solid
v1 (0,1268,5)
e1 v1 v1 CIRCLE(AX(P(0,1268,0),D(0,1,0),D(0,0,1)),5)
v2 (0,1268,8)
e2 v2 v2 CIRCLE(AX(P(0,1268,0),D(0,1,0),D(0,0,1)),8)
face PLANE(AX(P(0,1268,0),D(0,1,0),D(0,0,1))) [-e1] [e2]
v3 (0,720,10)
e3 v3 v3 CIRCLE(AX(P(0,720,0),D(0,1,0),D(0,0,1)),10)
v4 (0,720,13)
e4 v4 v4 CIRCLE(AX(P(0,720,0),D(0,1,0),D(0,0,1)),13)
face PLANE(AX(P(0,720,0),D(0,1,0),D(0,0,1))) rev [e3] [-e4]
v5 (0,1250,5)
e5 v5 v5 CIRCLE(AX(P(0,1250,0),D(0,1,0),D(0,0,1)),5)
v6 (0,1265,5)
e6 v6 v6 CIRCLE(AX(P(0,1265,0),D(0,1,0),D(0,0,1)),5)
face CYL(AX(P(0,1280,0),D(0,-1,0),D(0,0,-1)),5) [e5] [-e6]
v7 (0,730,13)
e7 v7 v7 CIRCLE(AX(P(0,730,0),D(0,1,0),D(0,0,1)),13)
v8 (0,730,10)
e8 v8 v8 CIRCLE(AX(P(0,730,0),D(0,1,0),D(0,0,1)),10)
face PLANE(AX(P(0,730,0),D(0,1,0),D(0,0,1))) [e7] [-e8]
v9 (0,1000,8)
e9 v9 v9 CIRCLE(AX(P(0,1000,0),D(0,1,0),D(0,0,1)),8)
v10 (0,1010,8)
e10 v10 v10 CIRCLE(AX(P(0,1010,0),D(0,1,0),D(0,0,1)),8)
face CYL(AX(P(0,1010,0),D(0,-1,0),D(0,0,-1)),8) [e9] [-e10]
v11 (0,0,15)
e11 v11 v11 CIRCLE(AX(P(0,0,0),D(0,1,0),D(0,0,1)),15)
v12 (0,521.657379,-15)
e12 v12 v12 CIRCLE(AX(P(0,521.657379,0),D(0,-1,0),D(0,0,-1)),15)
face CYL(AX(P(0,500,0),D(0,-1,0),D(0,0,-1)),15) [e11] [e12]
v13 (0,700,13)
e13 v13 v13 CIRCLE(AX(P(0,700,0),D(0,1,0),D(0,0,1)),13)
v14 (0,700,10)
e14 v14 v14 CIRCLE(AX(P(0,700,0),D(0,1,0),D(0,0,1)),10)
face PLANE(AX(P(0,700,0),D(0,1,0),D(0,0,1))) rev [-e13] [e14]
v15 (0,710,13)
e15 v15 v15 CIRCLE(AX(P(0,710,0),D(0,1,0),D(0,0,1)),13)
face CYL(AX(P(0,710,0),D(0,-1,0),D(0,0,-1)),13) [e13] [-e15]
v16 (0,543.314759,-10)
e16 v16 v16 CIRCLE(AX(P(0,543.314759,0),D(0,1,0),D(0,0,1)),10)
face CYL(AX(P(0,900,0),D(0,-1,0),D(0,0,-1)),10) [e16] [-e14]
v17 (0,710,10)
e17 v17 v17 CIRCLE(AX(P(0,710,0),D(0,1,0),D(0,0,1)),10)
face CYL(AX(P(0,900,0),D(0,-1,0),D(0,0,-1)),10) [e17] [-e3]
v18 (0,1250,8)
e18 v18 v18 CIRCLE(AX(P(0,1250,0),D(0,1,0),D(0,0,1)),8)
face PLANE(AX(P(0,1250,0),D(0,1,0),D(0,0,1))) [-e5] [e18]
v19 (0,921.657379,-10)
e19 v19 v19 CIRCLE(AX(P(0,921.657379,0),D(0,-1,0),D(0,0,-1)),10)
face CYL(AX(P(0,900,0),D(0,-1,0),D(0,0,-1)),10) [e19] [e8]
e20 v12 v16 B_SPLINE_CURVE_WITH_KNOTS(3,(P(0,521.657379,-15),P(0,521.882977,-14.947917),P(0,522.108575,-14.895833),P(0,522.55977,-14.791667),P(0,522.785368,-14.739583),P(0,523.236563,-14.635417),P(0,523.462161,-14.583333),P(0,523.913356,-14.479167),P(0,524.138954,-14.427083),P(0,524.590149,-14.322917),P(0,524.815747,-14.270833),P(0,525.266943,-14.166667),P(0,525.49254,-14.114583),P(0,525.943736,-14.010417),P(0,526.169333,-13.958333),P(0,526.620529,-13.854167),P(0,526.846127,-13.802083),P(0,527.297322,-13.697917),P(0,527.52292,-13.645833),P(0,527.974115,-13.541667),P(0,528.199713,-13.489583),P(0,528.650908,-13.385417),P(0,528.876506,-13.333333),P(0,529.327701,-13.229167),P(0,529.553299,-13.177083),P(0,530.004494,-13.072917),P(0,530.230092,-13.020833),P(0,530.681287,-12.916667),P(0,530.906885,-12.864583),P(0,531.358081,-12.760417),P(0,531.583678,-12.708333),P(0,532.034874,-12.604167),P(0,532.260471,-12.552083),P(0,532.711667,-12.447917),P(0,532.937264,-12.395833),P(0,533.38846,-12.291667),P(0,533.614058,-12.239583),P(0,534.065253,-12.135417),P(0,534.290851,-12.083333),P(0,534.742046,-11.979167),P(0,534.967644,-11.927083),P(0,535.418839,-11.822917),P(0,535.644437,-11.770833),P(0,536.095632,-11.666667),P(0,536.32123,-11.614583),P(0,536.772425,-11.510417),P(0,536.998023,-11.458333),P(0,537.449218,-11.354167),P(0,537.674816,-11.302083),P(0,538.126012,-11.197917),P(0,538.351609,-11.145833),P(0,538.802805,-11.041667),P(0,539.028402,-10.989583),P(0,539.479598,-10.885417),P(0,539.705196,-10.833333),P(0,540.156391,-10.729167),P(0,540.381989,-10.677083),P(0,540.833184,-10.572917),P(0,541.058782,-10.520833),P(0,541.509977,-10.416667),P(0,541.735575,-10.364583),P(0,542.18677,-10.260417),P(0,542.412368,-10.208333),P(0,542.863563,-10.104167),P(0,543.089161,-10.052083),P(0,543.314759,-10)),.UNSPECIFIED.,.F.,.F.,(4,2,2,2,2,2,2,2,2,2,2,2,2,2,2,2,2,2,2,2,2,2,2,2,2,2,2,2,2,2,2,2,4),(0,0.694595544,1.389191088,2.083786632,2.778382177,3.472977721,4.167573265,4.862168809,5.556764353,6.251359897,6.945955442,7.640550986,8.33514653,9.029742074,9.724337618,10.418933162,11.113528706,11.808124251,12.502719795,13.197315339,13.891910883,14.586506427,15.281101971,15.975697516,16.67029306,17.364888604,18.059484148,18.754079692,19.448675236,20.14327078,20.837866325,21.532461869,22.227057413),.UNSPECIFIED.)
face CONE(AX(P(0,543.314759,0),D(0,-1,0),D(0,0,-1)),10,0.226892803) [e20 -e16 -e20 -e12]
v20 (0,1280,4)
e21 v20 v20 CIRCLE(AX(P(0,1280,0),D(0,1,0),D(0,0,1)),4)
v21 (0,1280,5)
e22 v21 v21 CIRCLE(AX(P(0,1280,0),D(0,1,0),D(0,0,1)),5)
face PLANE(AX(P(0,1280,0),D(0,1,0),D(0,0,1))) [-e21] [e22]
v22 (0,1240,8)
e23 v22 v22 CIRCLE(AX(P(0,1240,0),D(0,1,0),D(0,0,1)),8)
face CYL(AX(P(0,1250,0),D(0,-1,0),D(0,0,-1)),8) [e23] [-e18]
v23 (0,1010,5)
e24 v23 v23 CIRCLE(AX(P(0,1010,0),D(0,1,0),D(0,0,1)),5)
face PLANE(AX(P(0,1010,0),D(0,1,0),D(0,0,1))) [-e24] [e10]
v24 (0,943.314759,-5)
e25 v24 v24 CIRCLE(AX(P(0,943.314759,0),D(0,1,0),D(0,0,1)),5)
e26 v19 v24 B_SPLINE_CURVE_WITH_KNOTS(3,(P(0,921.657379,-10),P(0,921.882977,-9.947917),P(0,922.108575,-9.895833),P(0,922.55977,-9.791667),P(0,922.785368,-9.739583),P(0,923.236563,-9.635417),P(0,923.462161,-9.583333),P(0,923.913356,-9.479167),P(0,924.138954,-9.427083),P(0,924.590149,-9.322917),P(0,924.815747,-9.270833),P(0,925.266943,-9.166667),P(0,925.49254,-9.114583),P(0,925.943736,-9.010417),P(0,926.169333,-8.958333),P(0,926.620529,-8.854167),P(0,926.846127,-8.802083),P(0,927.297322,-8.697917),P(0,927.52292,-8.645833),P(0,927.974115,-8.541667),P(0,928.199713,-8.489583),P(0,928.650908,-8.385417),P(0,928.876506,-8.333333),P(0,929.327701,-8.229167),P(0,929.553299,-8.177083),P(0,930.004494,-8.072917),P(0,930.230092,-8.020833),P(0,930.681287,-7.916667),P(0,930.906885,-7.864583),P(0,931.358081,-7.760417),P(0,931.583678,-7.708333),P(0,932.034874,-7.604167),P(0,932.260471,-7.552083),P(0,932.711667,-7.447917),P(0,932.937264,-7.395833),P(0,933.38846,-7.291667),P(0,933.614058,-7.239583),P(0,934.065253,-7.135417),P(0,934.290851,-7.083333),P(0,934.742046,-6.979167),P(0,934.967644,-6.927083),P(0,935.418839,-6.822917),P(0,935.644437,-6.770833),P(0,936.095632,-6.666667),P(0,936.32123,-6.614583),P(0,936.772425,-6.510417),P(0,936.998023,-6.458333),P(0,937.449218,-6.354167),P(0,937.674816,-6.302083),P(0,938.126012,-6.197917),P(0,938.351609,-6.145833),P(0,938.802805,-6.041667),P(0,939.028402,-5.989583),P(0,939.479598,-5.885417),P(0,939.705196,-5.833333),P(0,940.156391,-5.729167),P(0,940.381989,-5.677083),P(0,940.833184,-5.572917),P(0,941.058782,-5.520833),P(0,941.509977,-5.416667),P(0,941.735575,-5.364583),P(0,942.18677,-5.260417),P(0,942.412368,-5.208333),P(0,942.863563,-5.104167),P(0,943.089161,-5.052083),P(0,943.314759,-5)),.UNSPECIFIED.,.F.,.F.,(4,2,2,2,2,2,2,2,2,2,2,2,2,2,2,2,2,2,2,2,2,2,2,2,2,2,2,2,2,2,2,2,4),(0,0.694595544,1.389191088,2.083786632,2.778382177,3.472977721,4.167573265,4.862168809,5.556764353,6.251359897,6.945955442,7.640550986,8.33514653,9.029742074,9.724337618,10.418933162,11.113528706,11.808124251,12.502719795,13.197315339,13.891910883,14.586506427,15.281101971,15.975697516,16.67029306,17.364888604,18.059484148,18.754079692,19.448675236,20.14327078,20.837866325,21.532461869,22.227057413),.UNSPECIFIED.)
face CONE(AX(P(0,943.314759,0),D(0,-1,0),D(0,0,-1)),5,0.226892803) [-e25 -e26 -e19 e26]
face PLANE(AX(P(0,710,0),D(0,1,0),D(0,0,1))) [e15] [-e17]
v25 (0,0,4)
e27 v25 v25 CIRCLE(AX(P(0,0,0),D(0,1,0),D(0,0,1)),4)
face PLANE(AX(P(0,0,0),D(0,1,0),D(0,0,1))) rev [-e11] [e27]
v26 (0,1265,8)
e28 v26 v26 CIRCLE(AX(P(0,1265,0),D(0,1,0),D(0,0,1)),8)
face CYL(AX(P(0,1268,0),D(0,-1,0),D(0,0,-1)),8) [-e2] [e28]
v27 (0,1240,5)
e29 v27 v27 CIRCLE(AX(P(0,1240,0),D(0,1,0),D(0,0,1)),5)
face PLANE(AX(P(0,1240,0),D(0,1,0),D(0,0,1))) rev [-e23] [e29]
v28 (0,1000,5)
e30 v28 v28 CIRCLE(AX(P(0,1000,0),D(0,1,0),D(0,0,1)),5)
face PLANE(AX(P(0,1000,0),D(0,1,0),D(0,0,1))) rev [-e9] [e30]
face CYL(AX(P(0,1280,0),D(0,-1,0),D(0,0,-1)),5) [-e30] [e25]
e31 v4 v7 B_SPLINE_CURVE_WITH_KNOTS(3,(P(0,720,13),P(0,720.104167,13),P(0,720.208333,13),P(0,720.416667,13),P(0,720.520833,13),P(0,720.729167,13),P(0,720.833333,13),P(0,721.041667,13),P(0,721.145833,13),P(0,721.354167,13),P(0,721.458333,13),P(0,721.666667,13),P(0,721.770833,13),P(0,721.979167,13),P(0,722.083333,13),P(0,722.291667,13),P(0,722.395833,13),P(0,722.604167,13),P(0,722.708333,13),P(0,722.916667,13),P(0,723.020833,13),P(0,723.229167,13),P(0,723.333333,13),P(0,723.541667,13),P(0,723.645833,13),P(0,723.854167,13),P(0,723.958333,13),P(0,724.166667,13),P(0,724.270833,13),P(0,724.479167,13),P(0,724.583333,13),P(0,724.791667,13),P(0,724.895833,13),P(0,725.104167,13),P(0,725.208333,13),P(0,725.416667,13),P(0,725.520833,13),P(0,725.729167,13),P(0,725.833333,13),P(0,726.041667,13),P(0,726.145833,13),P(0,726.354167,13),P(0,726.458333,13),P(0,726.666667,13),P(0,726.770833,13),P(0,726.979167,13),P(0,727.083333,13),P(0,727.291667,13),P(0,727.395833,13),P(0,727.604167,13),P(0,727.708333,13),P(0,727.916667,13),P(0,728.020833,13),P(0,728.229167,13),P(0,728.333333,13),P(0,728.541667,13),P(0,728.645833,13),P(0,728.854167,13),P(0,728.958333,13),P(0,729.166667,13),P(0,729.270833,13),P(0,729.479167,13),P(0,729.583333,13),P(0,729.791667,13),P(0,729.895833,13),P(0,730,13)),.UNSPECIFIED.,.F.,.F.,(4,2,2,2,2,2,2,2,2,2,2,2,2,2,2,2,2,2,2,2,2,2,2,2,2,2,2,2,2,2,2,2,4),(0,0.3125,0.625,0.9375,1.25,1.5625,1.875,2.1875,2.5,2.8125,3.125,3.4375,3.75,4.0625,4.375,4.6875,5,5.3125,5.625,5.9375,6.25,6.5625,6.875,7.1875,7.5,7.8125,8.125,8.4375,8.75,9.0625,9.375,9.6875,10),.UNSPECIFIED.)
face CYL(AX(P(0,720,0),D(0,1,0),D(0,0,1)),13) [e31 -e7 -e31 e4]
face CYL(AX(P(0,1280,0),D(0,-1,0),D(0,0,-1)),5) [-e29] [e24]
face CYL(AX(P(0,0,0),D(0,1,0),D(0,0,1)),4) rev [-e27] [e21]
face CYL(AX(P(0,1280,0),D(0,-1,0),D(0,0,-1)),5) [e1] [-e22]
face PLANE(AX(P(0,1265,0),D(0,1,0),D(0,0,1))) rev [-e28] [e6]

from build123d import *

# Parameters (mm, degrees)
ESQUISSE1_R                  = 5
BOSS_EXTRU_1_DEPTH           = 1280
ESQUISSE2_R                  = 15
BOSS_EXTRU_2_DEPTH           = 500
ESQUISSE3_R                  = 10
BOSS_EXTRU_3_DEPTH           = 400
CHANFREIN1_SIZE              = 10
CHANFREIN1_SIZE_2            = 43.314758743
ENL_V_MAT_EXTRU_1_DEPTH      = 1281.175769182
ENL_V_MAT_EXTRU_1_DEPTH_BACK = 1281.175769182
ESQUISSE4_R                  = 4
ESQUISSE5_R                  = 13
ESQUISSE5_R_2                = 9.409989574
BOSS_EXTRU_4_DEPTH           = 10
ESQUISSE7_R                  = 8
ESQUISSE7_R_2                = 4.592937417
BOSS_EXTRU_5_DEPTH           = 10
ESQUISSE6_R                  = 8
ESQUISSE6_R_2                = 4.579122691
BOSS_EXTRU_6_DEPTH           = 10
BOSS_EXTRU_7_START           = 720
BOSS_EXTRU_7_OUTLINE_R       = 13
BOSS_EXTRU_7_OUTLINE_R_2     = 10
BOSS_EXTRU_7_DEPTH           = 10
ESQUISSE8_R                  = 8
ESQUISSE8_R_2                = 4.5
BOSS_EXTRU_8_DEPTH           = 3


# Read off the part's stored shape, not the designer's step: Boss.-Extru.7
with BuildPart() as part:
    # Esquisse1 → Boss.-Extru.1 (new body)
    with BuildSketch(Plane(origin=(0, 0, 0), x_dir=(1, 0, 0), z_dir=(0, 1, 0))):
        with Locations(Location((0, 0, 0), (0, 0, 270))):
            Circle(ESQUISSE1_R)
    extrude(amount=BOSS_EXTRU_1_DEPTH)

    # Esquisse2 → Boss.-Extru.2 (add)
    with BuildSketch(Plane(origin=(0, 0, 0), x_dir=(1, 0, 0), z_dir=(0, 1, 0))):
        with Locations(Location((0, 0, 0), (0, 0, 270))):
            Circle(ESQUISSE2_R)
    extrude(amount=BOSS_EXTRU_2_DEPTH)

    # Esquisse3 → Boss.-Extru.3 (add)
    with BuildSketch(Plane(origin=(0, 500, 0), x_dir=(1, 0, 0), z_dir=(0, 1, 0))):
        with Locations(Location((0, 0, 0), (0, 0, 270))):
            Circle(ESQUISSE3_R)
    extrude(amount=BOSS_EXTRU_3_DEPTH)

    # Chanfrein1
    # the kernel refuses this chamfer: 43.314758743, 10 mm, written as the material it adds along each edge
    with BuildSketch(Plane(origin=(0, 500, 0), x_dir=(0, 0, 1), z_dir=(-1, 0, 0))) as chanfrein1_piece_1_section:
        Polygon((10 + CHANFREIN1_SIZE, 0), (10, CHANFREIN1_SIZE_2), (10, 0), align=None)
    chanfrein1_piece_1 = revolve(axis=Axis((0, 500, 0), (0, 1, 0)), mode=Mode.PRIVATE)
    chanfrein1_piece_1 = chanfrein1_piece_1 & Plane(origin=(0, 533.274352099, 0), x_dir=(0, 0, 1), z_dir=(0, -1, 0)) * Cylinder(15, 174, mode=Mode.PRIVATE)
    add(chanfrein1_piece_1)
    with BuildSketch(Plane(origin=(0, 900, 0), x_dir=(0, 0, 1), z_dir=(1, 0, 0))) as chanfrein1_piece_2_section:
        Polygon((5 + CHANFREIN1_SIZE, 0), (5, -CHANFREIN1_SIZE_2), (5, 0), align=None)
    chanfrein1_piece_2 = revolve(axis=Axis((0, 900, 0), (0, -1, 0)), mode=Mode.PRIVATE)
    chanfrein1_piece_2 = chanfrein1_piece_2 & Plane(origin=(0, 933.283833366, 0), x_dir=(0, 0, 1), z_dir=(0, -1, 0)) * Cylinder(10, 174, mode=Mode.PRIVATE)
    add(chanfrein1_piece_2)

    # Esquisse4 → Enlèv. mat.-Extru.1 (cut, two sides: drawn at the far end of the back side and taken through both)
    with BuildSketch(Plane(origin=(0, 1280, 0), x_dir=(1, 0, 0), z_dir=(0, 1, 0)).offset(-ENL_V_MAT_EXTRU_1_DEPTH_BACK)):
        with Locations(Location((0, 0, 0), (0, 0, 270))):
            Circle(ESQUISSE4_R)
    extrude(amount=ENL_V_MAT_EXTRU_1_DEPTH + ENL_V_MAT_EXTRU_1_DEPTH_BACK, mode=Mode.SUBTRACT)

    # Esquisse5 → Boss.-Extru.4 (add)
    with BuildSketch(Plane(origin=(0, 700, 0), x_dir=(1, 0, 0), z_dir=(0, 1, 0))):
        with Locations(Location((0, 0, 0), (0, 0, 270))):
            Circle(ESQUISSE5_R)
        Circle(ESQUISSE5_R_2, mode=Mode.SUBTRACT)
    extrude(amount=BOSS_EXTRU_4_DEPTH)

    # Esquisse7 → Boss.-Extru.5 (add)
    with BuildSketch(Plane(origin=(0, 1240, 0), x_dir=(1, 0, 0), z_dir=(0, 1, 0))):
        with Locations(Location((0, 0, 0), (0, 0, 270))):
            Circle(ESQUISSE7_R)
        Circle(ESQUISSE7_R_2, mode=Mode.SUBTRACT)
    extrude(amount=BOSS_EXTRU_5_DEPTH)

    # Esquisse6 → Boss.-Extru.6 (add)
    with BuildSketch(Plane(origin=(0, 1000, 0), x_dir=(1, 0, 0), z_dir=(0, 1, 0))):
        with Locations(Location((0, 0, 0), (0, 0, 270))):
            Circle(ESQUISSE6_R)
        Circle(ESQUISSE6_R_2, mode=Mode.SUBTRACT)
    extrude(amount=BOSS_EXTRU_6_DEPTH)

    # Boss.-Extru.7 outline → Boss.-Extru.7 (add)
    with BuildSketch(Plane(origin=(0, 0, 0), x_dir=(1, 0, 0), z_dir=(0, 1, 0)).offset(BOSS_EXTRU_7_START)):
        Circle(BOSS_EXTRU_7_OUTLINE_R)
        Circle(BOSS_EXTRU_7_OUTLINE_R_2, mode=Mode.SUBTRACT)
    extrude(amount=BOSS_EXTRU_7_DEPTH)

    # Esquisse8 → Boss.-Extru.8 (add)
    with BuildSketch(Plane(origin=(0, 1265, 0), x_dir=(1, 0, 0), z_dir=(0, 1, 0))):
        with Locations(Location((0, 0, 0), (0, 0, 270))):
            Circle(ESQUISSE8_R)
        Circle(ESQUISSE8_R_2, mode=Mode.SUBTRACT)
    extrude(amount=BOSS_EXTRU_8_DEPTH)


solid = part.part
